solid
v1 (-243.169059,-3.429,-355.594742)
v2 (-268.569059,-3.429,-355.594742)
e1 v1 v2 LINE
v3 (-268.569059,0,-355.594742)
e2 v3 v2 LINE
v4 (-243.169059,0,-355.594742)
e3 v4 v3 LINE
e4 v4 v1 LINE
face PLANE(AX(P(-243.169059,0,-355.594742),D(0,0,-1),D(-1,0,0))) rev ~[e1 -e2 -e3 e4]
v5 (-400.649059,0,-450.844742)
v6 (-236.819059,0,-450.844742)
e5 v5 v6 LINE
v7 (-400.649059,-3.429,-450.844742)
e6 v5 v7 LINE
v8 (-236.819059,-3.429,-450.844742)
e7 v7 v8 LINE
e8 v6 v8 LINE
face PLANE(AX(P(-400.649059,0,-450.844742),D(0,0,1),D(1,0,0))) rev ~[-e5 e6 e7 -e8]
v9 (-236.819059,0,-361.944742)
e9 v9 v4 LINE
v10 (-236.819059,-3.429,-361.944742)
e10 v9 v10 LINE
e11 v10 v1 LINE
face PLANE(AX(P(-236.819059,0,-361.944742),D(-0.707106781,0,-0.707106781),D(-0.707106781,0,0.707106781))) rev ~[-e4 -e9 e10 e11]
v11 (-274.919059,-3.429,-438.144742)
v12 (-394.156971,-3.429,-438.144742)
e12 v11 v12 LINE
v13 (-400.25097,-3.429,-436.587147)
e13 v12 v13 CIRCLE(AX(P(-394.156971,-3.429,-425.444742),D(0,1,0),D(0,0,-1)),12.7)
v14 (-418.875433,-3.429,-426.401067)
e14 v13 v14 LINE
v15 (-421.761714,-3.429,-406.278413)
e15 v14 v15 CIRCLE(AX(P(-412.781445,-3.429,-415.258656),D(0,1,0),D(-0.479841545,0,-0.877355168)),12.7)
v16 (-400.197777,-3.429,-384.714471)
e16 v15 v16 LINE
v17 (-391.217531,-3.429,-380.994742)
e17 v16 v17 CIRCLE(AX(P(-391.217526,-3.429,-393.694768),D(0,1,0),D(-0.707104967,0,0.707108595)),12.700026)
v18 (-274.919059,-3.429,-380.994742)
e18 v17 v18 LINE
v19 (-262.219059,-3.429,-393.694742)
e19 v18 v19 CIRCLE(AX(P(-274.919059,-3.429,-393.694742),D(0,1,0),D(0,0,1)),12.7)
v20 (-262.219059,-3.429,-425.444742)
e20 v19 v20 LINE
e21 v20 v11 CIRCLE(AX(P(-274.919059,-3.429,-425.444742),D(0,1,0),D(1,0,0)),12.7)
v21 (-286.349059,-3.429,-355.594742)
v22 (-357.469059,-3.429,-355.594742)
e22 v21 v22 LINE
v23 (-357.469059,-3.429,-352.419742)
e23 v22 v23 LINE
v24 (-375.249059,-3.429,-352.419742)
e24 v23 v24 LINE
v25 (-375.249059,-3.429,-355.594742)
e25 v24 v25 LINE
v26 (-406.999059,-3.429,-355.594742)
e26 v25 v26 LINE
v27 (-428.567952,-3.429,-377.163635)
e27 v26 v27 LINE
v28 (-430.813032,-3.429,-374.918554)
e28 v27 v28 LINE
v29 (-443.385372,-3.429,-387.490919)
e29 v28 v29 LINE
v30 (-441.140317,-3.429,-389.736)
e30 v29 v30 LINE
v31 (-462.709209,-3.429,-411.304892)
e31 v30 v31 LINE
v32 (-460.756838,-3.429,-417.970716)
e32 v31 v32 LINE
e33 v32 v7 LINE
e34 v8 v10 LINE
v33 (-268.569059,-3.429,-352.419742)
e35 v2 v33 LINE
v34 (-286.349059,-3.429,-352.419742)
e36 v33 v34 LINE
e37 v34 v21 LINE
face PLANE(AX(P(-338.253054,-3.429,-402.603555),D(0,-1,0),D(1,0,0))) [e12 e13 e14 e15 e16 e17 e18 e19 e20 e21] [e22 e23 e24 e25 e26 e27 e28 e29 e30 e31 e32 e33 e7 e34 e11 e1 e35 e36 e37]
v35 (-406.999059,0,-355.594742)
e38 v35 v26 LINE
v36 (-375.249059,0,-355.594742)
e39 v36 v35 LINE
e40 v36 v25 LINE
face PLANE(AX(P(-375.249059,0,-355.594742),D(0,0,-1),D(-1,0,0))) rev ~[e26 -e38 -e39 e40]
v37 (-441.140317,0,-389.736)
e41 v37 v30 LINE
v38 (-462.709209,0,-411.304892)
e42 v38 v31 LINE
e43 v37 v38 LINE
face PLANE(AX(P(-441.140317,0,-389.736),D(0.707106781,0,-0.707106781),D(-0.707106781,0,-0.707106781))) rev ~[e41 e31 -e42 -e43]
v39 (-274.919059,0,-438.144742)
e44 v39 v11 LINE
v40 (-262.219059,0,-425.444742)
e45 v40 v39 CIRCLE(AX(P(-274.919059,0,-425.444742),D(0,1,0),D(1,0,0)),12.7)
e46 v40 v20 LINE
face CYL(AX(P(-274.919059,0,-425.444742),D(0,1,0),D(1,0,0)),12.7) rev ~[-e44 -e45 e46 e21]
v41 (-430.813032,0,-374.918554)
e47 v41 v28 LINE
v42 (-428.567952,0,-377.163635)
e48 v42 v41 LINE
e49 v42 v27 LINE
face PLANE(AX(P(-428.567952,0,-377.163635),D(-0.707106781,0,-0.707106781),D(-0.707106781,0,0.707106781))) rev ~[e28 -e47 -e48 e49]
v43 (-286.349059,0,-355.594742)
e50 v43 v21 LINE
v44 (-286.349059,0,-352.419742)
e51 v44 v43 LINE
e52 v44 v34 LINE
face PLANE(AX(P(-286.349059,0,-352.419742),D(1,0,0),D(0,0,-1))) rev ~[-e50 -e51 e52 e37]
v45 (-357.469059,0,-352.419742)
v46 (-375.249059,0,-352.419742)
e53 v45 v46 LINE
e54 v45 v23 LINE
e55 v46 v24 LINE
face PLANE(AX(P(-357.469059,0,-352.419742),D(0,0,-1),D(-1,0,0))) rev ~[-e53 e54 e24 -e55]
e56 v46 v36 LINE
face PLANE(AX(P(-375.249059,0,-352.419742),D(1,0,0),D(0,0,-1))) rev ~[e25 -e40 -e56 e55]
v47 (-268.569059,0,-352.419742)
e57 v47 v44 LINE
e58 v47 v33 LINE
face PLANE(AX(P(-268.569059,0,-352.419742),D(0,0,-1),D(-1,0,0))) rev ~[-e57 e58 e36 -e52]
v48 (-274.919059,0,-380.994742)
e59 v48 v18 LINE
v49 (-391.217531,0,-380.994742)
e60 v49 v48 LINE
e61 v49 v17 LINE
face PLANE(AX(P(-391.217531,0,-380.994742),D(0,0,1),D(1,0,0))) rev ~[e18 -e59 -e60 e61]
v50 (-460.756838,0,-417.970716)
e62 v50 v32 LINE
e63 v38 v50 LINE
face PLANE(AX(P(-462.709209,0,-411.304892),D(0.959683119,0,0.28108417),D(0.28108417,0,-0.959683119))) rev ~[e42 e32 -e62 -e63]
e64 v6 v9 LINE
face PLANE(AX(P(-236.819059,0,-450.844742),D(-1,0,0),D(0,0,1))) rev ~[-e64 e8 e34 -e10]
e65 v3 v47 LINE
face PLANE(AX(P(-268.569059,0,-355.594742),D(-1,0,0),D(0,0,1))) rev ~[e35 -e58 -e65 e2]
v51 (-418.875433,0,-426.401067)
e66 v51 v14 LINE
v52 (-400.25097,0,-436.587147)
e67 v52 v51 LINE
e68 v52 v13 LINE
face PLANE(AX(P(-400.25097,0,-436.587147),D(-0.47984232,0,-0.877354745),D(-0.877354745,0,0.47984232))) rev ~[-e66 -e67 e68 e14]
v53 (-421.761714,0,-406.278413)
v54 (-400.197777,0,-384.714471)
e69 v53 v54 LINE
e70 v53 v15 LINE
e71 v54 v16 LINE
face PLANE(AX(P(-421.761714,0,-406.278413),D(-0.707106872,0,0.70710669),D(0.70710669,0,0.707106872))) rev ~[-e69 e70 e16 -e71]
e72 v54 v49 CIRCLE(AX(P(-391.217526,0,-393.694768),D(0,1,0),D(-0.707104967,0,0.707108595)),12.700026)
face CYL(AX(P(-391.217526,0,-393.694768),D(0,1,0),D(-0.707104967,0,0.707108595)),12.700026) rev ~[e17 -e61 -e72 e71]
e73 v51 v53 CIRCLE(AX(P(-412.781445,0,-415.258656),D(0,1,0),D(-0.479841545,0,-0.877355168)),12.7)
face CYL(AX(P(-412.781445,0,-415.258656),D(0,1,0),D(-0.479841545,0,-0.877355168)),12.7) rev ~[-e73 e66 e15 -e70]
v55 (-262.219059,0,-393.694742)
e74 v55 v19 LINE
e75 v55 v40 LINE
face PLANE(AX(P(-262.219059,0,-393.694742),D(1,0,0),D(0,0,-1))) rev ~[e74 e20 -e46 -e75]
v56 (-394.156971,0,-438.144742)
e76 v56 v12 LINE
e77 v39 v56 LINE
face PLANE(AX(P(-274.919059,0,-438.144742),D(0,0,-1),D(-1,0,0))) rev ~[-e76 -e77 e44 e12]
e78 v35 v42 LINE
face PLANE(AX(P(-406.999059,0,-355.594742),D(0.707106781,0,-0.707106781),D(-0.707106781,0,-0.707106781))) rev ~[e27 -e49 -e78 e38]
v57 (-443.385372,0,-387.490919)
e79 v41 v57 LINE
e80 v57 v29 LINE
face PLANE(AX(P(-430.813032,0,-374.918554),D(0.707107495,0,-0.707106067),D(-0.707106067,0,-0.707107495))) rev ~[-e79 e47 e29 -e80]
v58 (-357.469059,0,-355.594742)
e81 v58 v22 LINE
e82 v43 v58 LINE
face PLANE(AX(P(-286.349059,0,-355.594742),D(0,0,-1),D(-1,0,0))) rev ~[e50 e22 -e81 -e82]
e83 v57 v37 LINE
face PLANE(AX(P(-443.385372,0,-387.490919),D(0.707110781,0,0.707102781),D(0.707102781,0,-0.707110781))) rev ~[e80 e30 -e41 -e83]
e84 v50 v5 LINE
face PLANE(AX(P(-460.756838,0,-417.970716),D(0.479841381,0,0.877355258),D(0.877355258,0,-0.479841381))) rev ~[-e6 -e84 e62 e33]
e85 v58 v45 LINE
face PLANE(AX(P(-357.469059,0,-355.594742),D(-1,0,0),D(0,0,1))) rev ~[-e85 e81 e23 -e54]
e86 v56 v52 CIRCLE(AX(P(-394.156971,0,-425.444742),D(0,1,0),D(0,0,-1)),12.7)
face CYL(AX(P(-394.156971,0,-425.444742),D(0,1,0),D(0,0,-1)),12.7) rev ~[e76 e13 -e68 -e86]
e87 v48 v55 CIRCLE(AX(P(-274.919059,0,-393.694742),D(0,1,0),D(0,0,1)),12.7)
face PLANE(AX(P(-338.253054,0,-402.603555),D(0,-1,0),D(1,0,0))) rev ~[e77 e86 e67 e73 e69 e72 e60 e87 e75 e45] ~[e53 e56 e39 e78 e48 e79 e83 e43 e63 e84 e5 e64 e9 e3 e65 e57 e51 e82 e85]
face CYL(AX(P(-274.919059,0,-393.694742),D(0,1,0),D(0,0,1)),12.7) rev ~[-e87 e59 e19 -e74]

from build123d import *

# Parameters (mm, degrees)
F1_DEPTH = 3.429


# Not quite as in the source:
# - ends of sketch curves that miss each other by under 0.0002 mm in the source are joined


with BuildPart() as f1:
    # F0 (on Front) → F1 (new body)
    with BuildSketch(Plane.XZ):
        Polygon((-357.469059, -352.4197422), (-375.249059, -352.4197422), (-375.249059, -355.5947422), (-406.999059, -355.5947422), (-428.5679516, -377.1636348), (-430.8130322, -374.9185542), (-443.3853718, -387.4909192), (-441.1403166, -389.7359998), (-462.7092092, -411.3048924), (-460.7568382, -417.970716), (-400.649059, -450.8447422), (-236.819059, -450.8447422), (-236.819059, -361.9447422), (-243.169059, -355.5947422), (-268.569059, -355.5947422), (-268.569059, -352.4197422), (-286.349059, -352.4197422), (-286.349059, -355.5947422), (-357.469059, -355.5947422), align=None)
        with BuildLine():
            ThreePointArc((-418.8754328238, -426.4010670387), (-425.3527857587, -417.0618193312), (-421.7617140211, -406.2784129789))
            Line((-421.7617140211, -406.2784129789), (-400.1977772, -384.7144706))
            ThreePointArc((-400.1977772, -384.7144706), (-396.0776022944, -381.9614687005), (-391.217531, -380.9947422))
            Line((-391.217531, -380.9947422), (-274.919059, -380.9947422))
            ThreePointArc((-274.919059, -380.9947422), (-265.9388028789, -384.7144860789), (-262.219059, -393.6947422))
            Line((-262.219059, -393.6947422), (-262.219059, -425.4447422))
            ThreePointArc((-262.219059, -425.4447422), (-265.9388028789, -434.4249983211), (-274.919059, -438.1447422))
            Line((-274.919059, -438.1447422), (-394.1569714, -438.1447422))
            ThreePointArc((-394.1569714, -438.1447422), (-397.3019244332, -437.7491832852), (-400.250969717, -436.5871469904))
            Line((-400.250969717, -436.5871469904), (-418.8754328238, -426.4010670387))
        make_face(mode=Mode.SUBTRACT)
    extrude(amount=F1_DEPTH)


solid = f1.part
